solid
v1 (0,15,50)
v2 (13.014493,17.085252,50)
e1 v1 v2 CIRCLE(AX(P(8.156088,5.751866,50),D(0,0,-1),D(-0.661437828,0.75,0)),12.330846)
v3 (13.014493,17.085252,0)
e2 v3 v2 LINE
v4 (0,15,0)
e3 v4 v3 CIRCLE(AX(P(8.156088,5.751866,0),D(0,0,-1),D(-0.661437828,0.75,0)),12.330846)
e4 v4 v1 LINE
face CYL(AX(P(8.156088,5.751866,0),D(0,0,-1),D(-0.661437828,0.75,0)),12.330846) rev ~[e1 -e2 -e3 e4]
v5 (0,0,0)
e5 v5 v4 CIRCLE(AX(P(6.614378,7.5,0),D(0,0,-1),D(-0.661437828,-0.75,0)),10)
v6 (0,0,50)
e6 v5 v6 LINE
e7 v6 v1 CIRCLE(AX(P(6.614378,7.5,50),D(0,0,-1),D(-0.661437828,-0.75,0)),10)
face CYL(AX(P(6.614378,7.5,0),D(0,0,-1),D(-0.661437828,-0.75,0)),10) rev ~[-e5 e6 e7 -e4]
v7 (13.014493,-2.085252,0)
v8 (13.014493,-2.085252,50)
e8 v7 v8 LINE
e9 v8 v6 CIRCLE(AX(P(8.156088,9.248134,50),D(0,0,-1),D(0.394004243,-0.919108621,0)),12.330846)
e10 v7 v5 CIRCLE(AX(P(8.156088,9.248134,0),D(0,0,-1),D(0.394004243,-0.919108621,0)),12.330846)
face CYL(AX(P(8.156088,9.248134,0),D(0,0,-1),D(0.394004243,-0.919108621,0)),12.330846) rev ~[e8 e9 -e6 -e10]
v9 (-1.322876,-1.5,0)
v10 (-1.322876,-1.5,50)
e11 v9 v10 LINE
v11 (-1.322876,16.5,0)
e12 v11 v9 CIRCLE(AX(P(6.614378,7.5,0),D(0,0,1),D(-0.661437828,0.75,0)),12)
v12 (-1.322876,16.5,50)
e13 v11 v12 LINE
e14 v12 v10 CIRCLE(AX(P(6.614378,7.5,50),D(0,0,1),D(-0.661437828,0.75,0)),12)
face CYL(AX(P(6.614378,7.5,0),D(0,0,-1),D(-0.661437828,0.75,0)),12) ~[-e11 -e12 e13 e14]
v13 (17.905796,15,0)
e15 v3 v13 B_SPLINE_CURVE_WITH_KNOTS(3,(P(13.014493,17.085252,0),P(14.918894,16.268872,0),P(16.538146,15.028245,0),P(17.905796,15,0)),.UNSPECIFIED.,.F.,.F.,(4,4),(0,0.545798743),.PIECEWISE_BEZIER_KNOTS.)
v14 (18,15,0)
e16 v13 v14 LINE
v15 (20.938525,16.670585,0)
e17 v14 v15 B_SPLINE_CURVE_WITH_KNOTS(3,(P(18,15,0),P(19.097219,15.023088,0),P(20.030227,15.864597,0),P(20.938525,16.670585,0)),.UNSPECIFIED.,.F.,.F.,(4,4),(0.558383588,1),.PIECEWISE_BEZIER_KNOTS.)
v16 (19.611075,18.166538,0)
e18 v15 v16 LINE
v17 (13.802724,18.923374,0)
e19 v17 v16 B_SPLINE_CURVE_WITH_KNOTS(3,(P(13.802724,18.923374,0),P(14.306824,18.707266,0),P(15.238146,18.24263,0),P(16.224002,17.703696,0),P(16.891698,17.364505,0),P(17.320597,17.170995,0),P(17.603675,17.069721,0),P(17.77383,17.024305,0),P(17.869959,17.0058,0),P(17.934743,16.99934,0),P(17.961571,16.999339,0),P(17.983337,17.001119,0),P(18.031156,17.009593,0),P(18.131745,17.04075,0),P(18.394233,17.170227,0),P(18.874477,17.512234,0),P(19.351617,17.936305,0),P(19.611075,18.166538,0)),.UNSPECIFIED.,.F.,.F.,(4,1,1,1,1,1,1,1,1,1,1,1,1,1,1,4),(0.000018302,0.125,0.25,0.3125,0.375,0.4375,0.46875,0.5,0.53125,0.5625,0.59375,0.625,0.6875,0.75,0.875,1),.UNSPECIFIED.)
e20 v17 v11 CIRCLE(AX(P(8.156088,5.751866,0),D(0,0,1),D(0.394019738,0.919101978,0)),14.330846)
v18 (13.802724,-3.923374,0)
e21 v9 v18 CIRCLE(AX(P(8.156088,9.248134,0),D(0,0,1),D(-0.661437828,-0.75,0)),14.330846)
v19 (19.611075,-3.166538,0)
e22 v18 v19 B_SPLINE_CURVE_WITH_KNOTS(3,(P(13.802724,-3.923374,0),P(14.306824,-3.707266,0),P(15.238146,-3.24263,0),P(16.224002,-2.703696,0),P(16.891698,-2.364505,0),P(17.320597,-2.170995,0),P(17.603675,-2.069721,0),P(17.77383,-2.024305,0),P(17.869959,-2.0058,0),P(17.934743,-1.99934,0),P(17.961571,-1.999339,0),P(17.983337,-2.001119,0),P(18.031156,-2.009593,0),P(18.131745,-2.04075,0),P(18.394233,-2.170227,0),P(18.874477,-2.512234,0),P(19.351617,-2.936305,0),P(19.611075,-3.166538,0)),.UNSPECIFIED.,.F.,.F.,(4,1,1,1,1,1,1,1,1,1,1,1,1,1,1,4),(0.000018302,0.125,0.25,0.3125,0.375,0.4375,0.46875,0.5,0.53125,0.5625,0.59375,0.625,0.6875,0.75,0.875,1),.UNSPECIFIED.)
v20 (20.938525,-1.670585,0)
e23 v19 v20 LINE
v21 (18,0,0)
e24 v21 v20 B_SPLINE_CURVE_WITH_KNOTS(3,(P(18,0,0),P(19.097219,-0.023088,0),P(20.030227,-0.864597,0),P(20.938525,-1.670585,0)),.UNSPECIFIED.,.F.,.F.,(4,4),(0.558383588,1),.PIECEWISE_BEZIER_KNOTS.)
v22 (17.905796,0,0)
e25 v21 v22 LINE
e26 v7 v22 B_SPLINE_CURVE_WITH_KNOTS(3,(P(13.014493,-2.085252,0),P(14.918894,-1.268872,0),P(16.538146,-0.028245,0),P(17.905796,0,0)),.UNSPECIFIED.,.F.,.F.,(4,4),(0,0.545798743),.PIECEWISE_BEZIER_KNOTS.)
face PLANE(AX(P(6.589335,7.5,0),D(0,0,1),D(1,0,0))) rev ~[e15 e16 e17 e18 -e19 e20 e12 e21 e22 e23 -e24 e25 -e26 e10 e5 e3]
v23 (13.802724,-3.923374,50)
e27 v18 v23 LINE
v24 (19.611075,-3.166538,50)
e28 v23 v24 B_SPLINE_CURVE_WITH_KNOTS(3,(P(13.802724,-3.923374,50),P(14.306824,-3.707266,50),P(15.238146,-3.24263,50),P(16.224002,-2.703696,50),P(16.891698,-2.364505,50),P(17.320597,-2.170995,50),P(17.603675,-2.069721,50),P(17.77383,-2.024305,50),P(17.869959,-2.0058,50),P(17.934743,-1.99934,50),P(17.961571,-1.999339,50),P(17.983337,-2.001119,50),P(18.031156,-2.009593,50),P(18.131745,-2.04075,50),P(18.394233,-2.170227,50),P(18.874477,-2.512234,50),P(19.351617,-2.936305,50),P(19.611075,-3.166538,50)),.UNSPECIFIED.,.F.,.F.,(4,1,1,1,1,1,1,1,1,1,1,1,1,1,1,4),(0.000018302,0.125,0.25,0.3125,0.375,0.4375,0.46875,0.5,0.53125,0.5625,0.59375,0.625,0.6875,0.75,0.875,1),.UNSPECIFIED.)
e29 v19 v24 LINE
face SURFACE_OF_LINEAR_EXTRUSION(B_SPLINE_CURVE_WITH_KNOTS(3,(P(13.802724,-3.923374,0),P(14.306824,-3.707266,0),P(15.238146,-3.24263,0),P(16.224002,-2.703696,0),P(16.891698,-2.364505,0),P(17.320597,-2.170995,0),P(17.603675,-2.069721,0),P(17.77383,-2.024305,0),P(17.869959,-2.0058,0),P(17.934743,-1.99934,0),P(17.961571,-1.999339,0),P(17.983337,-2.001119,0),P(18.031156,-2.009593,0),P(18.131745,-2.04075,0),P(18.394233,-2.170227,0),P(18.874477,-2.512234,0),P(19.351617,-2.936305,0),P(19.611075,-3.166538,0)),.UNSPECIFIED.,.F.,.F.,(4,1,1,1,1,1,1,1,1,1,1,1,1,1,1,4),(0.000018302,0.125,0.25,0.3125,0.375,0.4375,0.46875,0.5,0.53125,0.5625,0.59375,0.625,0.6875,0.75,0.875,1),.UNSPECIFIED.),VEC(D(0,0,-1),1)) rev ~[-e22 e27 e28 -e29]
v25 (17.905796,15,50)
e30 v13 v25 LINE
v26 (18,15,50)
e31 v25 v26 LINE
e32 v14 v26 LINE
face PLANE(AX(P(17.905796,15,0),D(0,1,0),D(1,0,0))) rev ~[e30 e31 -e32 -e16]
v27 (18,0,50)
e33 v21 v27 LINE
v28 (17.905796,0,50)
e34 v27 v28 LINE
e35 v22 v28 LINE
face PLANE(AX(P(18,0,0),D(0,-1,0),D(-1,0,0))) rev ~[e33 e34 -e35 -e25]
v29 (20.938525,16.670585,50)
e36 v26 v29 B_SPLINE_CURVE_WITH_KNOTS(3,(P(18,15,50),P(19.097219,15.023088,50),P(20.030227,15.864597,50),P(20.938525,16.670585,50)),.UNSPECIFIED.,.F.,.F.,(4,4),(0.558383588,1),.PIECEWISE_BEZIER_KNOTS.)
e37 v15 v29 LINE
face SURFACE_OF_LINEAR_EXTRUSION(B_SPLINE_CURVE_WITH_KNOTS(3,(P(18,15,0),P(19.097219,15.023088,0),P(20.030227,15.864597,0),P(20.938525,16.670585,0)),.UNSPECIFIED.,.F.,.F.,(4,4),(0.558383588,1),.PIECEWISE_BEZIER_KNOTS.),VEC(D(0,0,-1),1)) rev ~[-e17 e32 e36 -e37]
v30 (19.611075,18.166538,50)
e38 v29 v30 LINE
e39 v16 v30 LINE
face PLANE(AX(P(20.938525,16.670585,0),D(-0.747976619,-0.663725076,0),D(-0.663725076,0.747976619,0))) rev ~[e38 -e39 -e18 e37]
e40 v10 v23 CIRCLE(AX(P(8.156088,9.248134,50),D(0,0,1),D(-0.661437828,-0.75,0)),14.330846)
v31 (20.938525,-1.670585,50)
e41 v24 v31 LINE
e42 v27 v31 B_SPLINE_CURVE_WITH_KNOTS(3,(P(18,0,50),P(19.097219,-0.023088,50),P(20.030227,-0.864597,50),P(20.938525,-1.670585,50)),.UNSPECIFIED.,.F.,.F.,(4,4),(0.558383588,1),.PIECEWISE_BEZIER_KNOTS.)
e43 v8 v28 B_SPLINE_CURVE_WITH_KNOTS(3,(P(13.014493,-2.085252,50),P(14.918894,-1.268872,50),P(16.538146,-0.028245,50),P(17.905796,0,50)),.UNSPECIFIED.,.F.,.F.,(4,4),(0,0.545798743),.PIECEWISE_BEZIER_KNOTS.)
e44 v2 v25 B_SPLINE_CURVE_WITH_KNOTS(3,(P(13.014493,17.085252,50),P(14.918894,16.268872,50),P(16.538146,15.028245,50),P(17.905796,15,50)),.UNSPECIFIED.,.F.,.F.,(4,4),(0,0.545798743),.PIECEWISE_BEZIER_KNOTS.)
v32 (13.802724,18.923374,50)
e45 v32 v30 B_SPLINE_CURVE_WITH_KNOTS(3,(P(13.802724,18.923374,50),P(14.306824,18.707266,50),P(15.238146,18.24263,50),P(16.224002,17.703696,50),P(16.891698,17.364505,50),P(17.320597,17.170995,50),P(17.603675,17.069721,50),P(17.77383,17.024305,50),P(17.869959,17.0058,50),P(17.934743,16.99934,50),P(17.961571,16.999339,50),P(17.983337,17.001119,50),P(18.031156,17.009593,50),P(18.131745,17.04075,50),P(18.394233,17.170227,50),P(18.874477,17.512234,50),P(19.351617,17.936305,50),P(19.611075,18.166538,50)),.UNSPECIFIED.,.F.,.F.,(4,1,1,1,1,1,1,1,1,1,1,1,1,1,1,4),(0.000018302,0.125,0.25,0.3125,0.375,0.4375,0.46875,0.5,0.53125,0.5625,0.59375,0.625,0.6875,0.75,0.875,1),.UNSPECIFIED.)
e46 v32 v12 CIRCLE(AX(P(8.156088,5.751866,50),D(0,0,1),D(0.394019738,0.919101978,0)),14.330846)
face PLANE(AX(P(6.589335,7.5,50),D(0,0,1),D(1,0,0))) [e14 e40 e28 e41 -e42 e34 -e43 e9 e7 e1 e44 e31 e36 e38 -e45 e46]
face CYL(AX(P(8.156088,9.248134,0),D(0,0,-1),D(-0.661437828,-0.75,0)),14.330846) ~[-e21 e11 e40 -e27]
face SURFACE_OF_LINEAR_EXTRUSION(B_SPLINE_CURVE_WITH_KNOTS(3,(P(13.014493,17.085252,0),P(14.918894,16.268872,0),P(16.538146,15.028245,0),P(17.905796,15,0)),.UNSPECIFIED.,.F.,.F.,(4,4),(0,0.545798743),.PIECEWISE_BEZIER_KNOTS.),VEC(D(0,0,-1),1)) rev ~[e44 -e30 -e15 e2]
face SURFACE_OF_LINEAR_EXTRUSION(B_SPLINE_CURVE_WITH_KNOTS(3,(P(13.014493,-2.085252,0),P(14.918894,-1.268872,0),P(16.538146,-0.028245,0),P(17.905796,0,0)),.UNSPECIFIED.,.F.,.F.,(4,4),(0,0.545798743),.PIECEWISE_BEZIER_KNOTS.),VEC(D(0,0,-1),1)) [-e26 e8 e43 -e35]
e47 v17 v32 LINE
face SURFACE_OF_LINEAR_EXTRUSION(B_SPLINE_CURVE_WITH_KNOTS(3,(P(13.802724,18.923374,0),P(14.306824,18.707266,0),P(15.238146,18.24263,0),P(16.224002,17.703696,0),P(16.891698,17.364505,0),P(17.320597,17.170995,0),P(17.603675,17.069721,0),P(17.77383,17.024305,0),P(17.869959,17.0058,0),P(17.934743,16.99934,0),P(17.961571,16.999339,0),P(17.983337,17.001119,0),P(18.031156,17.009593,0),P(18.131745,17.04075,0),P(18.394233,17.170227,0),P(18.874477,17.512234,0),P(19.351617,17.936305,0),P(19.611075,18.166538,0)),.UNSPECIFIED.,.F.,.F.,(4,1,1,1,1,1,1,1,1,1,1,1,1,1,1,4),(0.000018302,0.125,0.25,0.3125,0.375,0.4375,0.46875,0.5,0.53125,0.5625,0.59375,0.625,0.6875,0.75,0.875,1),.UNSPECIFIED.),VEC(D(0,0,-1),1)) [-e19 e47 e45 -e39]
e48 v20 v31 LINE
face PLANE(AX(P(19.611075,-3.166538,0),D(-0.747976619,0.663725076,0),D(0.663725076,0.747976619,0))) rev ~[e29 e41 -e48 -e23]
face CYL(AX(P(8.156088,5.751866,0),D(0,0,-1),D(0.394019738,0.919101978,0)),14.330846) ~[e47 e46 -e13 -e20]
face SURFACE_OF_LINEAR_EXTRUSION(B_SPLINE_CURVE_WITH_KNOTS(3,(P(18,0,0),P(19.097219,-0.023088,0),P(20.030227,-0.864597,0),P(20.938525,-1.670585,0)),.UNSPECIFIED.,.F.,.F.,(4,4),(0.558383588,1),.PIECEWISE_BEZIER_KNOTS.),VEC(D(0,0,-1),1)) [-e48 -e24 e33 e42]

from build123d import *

# Parameters (mm, degrees)
F1_DEPTH = 50


# Not quite as in the source:
# - the dataset's text gives a spline's control points without its knots; the knots are read off the source's solid


with BuildPart() as f1:
    # F0 (on Top) → F1 (new body)
    with BuildSketch(Plane.XY):
        with BuildLine():
            ThreePointArc((13.0144933843, -2.085252316), (6.205255597, -2.9274153897), (0, 0))
            ThreePointArc((0, 0), (-3.3856217223, 7.5), (0, 15))
            ThreePointArc((0, 15), (6.205255597, 17.9274153897), (13.0144933843, 17.085252316))
            add(Edge.make_bspline(
                [(13.0144933843, 17.085252316), (14.9188937147, 16.2688716797), (16.5381459826, 15.0282447438), (17.9057964085, 15)],
                knots=[0, 0, 0, 0, 0.5457987429, 0.5457987429, 0.5457987429, 0.5457987429], degree=3))
            Line((17.9057964085, 15), (18, 15))
            add(Edge.make_bspline(
                [(18, 15), (19.0972191031, 15.0230880512), (20.0302273141, 15.8645970051), (20.9385249764, 16.6705846786)],
                knots=[0.5583835876, 0.5583835876, 0.5583835876, 0.5583835876, 1, 1, 1, 1], degree=3))
            Line((20.9385249764, 16.6705846786), (19.6110748236, 18.1665379172))
            add(Edge.make_bspline(
                [(13.8027239443, 18.9233743561), (14.3068240335, 18.7072663795), (15.238145762, 18.2426302327), (16.2240017083, 17.7036956521), (16.8916980315, 17.3645051566), (17.3205970551, 17.1709950677), (17.6036754274, 17.0697214684), (17.7738298239, 17.0243049098), (17.8699589675, 17.0058001031), (17.9347425496, 16.9993397818), (17.9615712094, 16.9993392849), (17.983336855, 17.0011188424), (18.031156036, 17.0095932598), (18.1317450508, 17.0407501327), (18.3942332342, 17.1702266018), (18.8744768256, 17.5122343093), (19.3516165065, 17.9363047964), (19.6110748236, 18.1665379172)],
                knots=[1.83025e-05, 1.83025e-05, 1.83025e-05, 1.83025e-05, 0.125, 0.25, 0.3125, 0.375, 0.4375, 0.46875, 0.5, 0.53125, 0.5625, 0.59375, 0.625, 0.6875, 0.75, 0.875, 1, 1, 1, 1], degree=3))
            ThreePointArc((13.8027239307, 18.9233743619), (5.8889598851, 19.9022462774), (-1.3228756555, 16.5))
            ThreePointArc((-1.3228756555, 16.5), (-5.3856217223, 7.5), (-1.3228756555, -1.5))
            ThreePointArc((-1.3228756555, -1.5), (5.8889598851, -4.9022462774), (13.8027239307, -3.9233743619))
            add(Edge.make_bspline(
                [(13.8027239443, -3.9233743561), (14.3068240335, -3.7072663795), (15.238145762, -3.2426302327), (16.2240017083, -2.7036956521), (16.8916980315, -2.3645051566), (17.3205970551, -2.1709950677), (17.6036754274, -2.0697214684), (17.7738298239, -2.0243049098), (17.8699589675, -2.0058001031), (17.9347425496, -1.9993397818), (17.9615712094, -1.9993392849), (17.983336855, -2.0011188424), (18.031156036, -2.0095932598), (18.1317450508, -2.0407501327), (18.3942332342, -2.1702266018), (18.8744768256, -2.5122343093), (19.3516165065, -2.9363047964), (19.6110748236, -3.1665379172)],
                knots=[1.83025e-05, 1.83025e-05, 1.83025e-05, 1.83025e-05, 0.125, 0.25, 0.3125, 0.375, 0.4375, 0.46875, 0.5, 0.53125, 0.5625, 0.59375, 0.625, 0.6875, 0.75, 0.875, 1, 1, 1, 1], degree=3))
            Line((19.6110748236, -3.1665379172), (20.9385249764, -1.6705846786))
            add(Edge.make_bspline(
                [(18, 0), (19.0972191031, -0.0230880512), (20.0302273141, -0.8645970051), (20.9385249764, -1.6705846786)],
                knots=[0.5583835876, 0.5583835876, 0.5583835876, 0.5583835876, 1, 1, 1, 1], degree=3))
            Line((18, 0), (17.9057964085, 0))
            add(Edge.make_bspline(
                [(13.0144933843, -2.085252316), (14.9188937147, -1.2688716797), (16.5381459826, -0.0282447438), (17.9057964085, 0)],
                knots=[0, 0, 0, 0, 0.5457987429, 0.5457987429, 0.5457987429, 0.5457987429], degree=3))
        make_face()
    extrude(amount=F1_DEPTH)


solid = f1.part
